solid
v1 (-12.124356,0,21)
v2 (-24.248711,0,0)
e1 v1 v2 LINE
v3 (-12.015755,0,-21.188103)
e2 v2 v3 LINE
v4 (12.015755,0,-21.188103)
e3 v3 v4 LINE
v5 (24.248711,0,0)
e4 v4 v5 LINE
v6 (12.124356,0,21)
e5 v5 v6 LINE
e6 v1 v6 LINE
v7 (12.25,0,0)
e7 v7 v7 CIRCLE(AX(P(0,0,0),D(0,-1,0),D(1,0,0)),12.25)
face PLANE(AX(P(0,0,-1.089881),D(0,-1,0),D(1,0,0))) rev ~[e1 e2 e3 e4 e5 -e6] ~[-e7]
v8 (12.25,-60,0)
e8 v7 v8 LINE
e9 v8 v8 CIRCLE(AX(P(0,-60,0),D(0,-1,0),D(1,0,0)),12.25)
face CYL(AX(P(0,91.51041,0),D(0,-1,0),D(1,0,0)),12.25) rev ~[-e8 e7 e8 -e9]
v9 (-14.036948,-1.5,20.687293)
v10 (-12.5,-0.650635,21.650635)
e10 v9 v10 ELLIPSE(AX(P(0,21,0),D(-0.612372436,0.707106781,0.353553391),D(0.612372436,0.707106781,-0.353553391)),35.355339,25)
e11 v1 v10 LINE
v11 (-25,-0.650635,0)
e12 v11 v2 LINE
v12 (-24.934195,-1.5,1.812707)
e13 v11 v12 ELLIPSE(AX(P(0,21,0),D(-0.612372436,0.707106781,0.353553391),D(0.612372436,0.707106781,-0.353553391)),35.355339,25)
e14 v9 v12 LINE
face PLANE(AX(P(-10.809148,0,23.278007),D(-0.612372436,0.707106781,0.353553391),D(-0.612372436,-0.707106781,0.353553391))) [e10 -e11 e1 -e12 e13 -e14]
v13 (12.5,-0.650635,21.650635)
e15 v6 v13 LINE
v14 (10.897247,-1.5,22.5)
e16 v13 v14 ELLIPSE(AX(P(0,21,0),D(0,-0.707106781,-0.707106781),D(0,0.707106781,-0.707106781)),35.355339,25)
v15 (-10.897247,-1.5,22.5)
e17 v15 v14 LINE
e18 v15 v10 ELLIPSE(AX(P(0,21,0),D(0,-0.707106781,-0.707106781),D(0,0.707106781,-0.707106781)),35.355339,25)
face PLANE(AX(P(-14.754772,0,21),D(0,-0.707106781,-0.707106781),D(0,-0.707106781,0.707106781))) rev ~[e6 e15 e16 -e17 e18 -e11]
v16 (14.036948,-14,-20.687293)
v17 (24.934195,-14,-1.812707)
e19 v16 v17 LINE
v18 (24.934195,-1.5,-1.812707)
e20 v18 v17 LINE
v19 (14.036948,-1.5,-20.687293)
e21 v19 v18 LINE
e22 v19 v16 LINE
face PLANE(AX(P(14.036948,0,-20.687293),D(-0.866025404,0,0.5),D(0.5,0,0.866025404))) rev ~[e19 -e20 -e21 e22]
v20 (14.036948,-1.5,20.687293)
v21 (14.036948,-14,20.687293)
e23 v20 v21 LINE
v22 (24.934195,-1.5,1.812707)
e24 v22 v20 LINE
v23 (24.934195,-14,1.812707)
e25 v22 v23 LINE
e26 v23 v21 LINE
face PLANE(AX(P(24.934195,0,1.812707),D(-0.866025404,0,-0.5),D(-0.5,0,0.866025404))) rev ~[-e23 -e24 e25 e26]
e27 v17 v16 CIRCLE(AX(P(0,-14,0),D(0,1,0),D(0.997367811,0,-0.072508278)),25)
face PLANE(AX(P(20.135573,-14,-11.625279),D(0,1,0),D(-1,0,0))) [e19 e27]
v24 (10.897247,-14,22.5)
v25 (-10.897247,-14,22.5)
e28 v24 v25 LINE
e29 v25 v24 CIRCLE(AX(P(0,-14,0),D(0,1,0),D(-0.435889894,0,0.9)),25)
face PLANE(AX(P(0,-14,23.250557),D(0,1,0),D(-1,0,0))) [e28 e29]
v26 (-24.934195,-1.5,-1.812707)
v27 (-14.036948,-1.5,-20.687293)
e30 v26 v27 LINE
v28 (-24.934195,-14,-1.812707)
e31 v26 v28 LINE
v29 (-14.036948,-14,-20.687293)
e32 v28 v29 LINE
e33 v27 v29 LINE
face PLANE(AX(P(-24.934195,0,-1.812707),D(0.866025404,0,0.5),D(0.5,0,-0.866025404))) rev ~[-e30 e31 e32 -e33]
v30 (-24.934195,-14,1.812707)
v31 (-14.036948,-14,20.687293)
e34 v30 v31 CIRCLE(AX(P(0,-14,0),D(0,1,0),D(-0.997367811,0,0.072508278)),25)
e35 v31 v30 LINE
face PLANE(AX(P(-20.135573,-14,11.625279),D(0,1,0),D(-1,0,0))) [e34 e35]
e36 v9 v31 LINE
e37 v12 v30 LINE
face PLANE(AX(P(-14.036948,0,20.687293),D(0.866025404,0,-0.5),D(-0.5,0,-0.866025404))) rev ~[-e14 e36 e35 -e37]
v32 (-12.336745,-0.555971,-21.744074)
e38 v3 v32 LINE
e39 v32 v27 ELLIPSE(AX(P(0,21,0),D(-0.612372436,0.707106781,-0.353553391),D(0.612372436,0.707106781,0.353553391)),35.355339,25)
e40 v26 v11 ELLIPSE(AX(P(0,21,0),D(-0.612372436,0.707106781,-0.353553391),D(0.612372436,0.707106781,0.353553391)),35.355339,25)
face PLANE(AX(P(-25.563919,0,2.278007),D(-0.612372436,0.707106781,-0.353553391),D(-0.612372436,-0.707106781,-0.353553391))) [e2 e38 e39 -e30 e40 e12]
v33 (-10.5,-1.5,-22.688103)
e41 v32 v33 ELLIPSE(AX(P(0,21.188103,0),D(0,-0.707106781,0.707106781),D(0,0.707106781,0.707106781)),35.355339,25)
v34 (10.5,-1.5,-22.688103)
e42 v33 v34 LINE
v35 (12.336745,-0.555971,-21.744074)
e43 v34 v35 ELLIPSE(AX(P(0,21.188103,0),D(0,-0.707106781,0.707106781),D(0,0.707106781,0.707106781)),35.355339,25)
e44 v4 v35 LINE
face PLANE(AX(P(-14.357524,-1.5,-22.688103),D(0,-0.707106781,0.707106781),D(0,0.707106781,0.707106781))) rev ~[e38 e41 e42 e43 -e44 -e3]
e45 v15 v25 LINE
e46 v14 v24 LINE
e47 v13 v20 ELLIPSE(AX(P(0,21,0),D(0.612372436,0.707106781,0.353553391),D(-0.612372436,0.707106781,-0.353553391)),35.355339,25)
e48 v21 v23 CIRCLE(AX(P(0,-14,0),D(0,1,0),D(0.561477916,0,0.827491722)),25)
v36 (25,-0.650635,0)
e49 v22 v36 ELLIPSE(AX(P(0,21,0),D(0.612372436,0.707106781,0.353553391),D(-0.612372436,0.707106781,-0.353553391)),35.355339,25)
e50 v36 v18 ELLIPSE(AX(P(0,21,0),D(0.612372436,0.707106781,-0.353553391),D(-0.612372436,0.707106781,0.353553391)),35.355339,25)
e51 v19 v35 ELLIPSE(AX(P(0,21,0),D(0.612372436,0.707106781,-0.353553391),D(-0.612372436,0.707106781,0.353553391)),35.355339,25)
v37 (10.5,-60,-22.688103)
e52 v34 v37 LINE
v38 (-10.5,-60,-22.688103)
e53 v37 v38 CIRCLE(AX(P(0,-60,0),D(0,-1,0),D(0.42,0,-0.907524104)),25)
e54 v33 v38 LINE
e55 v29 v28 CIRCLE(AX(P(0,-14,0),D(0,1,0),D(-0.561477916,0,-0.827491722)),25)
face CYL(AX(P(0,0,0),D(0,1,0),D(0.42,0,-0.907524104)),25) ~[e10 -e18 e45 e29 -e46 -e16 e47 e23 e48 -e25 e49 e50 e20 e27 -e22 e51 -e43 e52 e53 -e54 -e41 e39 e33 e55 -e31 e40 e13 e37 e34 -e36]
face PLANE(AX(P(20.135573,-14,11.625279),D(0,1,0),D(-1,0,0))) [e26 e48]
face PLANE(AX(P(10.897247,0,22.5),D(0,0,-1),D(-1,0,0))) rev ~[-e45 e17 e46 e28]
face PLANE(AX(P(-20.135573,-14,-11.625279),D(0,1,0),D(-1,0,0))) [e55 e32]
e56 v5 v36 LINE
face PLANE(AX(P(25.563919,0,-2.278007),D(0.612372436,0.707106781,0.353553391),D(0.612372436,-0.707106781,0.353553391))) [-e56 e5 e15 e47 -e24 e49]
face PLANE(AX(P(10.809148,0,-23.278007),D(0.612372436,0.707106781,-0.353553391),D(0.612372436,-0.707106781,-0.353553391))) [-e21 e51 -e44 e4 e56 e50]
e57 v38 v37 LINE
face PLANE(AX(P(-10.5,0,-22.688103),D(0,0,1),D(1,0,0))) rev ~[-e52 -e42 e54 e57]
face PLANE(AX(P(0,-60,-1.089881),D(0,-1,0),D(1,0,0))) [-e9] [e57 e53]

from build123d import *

# Parameters (mm, degrees)
F1_DEPTH     = 60
F3_DEPTH     = 14
F4_D         = 24.5
F5_T1_DEPTH  = 29.5095436816
F5_T3_DEPTH  = 28.7150489639
F5_T5_DEPTH  = 29.5095436816
F5_T7_DEPTH  = 29.5095436816
F5_T9_DEPTH  = 29.5095436816
F5_T11_DEPTH = 29.5095436816


# Not quite as in the source:
# - a fillet or chamfer that OpenCascade refuses, or shapes differently, is made with other operations: its cross-section is extruded or revolved along the edge and cut away or added


with BuildPart() as f1:
    # F0 (on Front) → F1 (new body)
    with BuildSketch(Plane.XZ):
        with BuildLine():
            Line((-10.5, -22.6881026091), (10.5, -22.6881026091))
            ThreePointArc((10.5, -22.6881026091), (0, 25), (-10.5, -22.6881026091))
        make_face()
    extrude(amount=F1_DEPTH)

    # F2 (on face) → F3 (cut)
    with BuildSketch(Plane(origin=(0, 0, 0), x_dir=(-1, 0, 0), z_dir=(0, 1, 0))):
        with BuildLine():
            ThreePointArc((-24.9341952646, -1.8127069559), (-21.6506350946, -12.5), (-14.0369479057, -20.6872930441))
            Line((-14.0369479057, -20.6872930441), (-24.9341952646, -1.8127069559))
        make_face()
        with BuildLine():
            Line((-24.9341952646, 1.8127069559), (-14.0369479057, 20.6872930441))
            ThreePointArc((-14.0369479057, 20.6872930441), (-21.6506350946, 12.5), (-24.9341952646, 1.8127069559))
        make_face()
        with BuildLine():
            Line((-10.8972473589, 22.5), (10.8972473589, 22.5))
            ThreePointArc((10.8972473589, 22.5), (0, 25), (-10.8972473589, 22.5))
        make_face()
        with BuildLine():
            ThreePointArc((14.0369479057, -20.6872930441), (21.6506350946, -12.5), (24.9341952646, -1.8127069559))
            Line((24.9341952646, -1.8127069559), (14.0369479057, -20.6872930441))
        make_face()
        with BuildLine():
            Line((14.0369479057, 20.6872930441), (24.9341952646, 1.8127069559))
            ThreePointArc((24.9341952646, 1.8127069559), (21.6506350946, 12.5), (14.0369479057, 20.6872930441))
        make_face()
    extrude(amount=-F3_DEPTH, mode=Mode.SUBTRACT)

    # F4 (through all)
    with Locations(Plane(origin=(0, 0, 0), x_dir=(-1, 0, 0), z_dir=(0, 1, 0))):
        with Locations((0, 0)):
            Hole(F4_D / 2)

    # F5: chamfer of 1.5 on 6 edges, made by hand

    # F5_s2 → F5_t1 (cut)
    with BuildSketch(Plane(origin=(-7.3773859204, 0, -12.7780072412), x_dir=(0, 1, 0), z_dir=(0.5, 0, 0.8660254038))):
        Polygon((0, -21), (-1.5, -22.5), (0, -22.5), align=None)
    extrude(amount=F5_T1_DEPTH, mode=Mode.SUBTRACT)

    # F5_s4 → F5_t3 (cut)
    with BuildSketch(Plane.YZ.offset(-14.3575244819)):
        Polygon((-1.5, -22.6881026091), (0, -21.1881026091), (0, -22.6881026091), align=None)
    extrude(amount=F5_T3_DEPTH, mode=Mode.SUBTRACT)

    # F5_s6 → F5_t5 (cut)
    with BuildSketch(Plane(origin=(-7.3773859204, 0, 12.7780072412), x_dir=(0, 1, 0), z_dir=(0.5, 0, -0.8660254038))):
        Polygon((0, -21), (-1.5, -22.5), (0, -22.5), align=None)
    extrude(amount=F5_T5_DEPTH, mode=Mode.SUBTRACT)

    # F5_s8 → F5_t7 (cut)
    with BuildSketch(Plane(origin=(7.3773859204, 0, 12.7780072412), x_dir=(0, 1, 0), z_dir=(-0.5, 0, -0.8660254038))):
        Polygon((0, -21), (-1.5, -22.5), (0, -22.5), align=None)
    extrude(amount=F5_T7_DEPTH, mode=Mode.SUBTRACT)

    # F5_s10 → F5_t9 (cut)
    with BuildSketch(Plane.YZ.offset(-14.7547718408)):
        Polygon((0, 21), (-1.5, 22.5), (0, 22.5), align=None)
    extrude(amount=F5_T9_DEPTH, mode=Mode.SUBTRACT)

    # F5_s12 → F5_t11 (cut)
    with BuildSketch(Plane(origin=(7.3773859204, 0, -12.7780072412), x_dir=(0, 1, 0), z_dir=(-0.5, 0, 0.8660254038))):
        Polygon((0, -21), (-1.5, -22.5), (0, -22.5), align=None)
    extrude(amount=F5_T11_DEPTH, mode=Mode.SUBTRACT)


solid = f1.part
